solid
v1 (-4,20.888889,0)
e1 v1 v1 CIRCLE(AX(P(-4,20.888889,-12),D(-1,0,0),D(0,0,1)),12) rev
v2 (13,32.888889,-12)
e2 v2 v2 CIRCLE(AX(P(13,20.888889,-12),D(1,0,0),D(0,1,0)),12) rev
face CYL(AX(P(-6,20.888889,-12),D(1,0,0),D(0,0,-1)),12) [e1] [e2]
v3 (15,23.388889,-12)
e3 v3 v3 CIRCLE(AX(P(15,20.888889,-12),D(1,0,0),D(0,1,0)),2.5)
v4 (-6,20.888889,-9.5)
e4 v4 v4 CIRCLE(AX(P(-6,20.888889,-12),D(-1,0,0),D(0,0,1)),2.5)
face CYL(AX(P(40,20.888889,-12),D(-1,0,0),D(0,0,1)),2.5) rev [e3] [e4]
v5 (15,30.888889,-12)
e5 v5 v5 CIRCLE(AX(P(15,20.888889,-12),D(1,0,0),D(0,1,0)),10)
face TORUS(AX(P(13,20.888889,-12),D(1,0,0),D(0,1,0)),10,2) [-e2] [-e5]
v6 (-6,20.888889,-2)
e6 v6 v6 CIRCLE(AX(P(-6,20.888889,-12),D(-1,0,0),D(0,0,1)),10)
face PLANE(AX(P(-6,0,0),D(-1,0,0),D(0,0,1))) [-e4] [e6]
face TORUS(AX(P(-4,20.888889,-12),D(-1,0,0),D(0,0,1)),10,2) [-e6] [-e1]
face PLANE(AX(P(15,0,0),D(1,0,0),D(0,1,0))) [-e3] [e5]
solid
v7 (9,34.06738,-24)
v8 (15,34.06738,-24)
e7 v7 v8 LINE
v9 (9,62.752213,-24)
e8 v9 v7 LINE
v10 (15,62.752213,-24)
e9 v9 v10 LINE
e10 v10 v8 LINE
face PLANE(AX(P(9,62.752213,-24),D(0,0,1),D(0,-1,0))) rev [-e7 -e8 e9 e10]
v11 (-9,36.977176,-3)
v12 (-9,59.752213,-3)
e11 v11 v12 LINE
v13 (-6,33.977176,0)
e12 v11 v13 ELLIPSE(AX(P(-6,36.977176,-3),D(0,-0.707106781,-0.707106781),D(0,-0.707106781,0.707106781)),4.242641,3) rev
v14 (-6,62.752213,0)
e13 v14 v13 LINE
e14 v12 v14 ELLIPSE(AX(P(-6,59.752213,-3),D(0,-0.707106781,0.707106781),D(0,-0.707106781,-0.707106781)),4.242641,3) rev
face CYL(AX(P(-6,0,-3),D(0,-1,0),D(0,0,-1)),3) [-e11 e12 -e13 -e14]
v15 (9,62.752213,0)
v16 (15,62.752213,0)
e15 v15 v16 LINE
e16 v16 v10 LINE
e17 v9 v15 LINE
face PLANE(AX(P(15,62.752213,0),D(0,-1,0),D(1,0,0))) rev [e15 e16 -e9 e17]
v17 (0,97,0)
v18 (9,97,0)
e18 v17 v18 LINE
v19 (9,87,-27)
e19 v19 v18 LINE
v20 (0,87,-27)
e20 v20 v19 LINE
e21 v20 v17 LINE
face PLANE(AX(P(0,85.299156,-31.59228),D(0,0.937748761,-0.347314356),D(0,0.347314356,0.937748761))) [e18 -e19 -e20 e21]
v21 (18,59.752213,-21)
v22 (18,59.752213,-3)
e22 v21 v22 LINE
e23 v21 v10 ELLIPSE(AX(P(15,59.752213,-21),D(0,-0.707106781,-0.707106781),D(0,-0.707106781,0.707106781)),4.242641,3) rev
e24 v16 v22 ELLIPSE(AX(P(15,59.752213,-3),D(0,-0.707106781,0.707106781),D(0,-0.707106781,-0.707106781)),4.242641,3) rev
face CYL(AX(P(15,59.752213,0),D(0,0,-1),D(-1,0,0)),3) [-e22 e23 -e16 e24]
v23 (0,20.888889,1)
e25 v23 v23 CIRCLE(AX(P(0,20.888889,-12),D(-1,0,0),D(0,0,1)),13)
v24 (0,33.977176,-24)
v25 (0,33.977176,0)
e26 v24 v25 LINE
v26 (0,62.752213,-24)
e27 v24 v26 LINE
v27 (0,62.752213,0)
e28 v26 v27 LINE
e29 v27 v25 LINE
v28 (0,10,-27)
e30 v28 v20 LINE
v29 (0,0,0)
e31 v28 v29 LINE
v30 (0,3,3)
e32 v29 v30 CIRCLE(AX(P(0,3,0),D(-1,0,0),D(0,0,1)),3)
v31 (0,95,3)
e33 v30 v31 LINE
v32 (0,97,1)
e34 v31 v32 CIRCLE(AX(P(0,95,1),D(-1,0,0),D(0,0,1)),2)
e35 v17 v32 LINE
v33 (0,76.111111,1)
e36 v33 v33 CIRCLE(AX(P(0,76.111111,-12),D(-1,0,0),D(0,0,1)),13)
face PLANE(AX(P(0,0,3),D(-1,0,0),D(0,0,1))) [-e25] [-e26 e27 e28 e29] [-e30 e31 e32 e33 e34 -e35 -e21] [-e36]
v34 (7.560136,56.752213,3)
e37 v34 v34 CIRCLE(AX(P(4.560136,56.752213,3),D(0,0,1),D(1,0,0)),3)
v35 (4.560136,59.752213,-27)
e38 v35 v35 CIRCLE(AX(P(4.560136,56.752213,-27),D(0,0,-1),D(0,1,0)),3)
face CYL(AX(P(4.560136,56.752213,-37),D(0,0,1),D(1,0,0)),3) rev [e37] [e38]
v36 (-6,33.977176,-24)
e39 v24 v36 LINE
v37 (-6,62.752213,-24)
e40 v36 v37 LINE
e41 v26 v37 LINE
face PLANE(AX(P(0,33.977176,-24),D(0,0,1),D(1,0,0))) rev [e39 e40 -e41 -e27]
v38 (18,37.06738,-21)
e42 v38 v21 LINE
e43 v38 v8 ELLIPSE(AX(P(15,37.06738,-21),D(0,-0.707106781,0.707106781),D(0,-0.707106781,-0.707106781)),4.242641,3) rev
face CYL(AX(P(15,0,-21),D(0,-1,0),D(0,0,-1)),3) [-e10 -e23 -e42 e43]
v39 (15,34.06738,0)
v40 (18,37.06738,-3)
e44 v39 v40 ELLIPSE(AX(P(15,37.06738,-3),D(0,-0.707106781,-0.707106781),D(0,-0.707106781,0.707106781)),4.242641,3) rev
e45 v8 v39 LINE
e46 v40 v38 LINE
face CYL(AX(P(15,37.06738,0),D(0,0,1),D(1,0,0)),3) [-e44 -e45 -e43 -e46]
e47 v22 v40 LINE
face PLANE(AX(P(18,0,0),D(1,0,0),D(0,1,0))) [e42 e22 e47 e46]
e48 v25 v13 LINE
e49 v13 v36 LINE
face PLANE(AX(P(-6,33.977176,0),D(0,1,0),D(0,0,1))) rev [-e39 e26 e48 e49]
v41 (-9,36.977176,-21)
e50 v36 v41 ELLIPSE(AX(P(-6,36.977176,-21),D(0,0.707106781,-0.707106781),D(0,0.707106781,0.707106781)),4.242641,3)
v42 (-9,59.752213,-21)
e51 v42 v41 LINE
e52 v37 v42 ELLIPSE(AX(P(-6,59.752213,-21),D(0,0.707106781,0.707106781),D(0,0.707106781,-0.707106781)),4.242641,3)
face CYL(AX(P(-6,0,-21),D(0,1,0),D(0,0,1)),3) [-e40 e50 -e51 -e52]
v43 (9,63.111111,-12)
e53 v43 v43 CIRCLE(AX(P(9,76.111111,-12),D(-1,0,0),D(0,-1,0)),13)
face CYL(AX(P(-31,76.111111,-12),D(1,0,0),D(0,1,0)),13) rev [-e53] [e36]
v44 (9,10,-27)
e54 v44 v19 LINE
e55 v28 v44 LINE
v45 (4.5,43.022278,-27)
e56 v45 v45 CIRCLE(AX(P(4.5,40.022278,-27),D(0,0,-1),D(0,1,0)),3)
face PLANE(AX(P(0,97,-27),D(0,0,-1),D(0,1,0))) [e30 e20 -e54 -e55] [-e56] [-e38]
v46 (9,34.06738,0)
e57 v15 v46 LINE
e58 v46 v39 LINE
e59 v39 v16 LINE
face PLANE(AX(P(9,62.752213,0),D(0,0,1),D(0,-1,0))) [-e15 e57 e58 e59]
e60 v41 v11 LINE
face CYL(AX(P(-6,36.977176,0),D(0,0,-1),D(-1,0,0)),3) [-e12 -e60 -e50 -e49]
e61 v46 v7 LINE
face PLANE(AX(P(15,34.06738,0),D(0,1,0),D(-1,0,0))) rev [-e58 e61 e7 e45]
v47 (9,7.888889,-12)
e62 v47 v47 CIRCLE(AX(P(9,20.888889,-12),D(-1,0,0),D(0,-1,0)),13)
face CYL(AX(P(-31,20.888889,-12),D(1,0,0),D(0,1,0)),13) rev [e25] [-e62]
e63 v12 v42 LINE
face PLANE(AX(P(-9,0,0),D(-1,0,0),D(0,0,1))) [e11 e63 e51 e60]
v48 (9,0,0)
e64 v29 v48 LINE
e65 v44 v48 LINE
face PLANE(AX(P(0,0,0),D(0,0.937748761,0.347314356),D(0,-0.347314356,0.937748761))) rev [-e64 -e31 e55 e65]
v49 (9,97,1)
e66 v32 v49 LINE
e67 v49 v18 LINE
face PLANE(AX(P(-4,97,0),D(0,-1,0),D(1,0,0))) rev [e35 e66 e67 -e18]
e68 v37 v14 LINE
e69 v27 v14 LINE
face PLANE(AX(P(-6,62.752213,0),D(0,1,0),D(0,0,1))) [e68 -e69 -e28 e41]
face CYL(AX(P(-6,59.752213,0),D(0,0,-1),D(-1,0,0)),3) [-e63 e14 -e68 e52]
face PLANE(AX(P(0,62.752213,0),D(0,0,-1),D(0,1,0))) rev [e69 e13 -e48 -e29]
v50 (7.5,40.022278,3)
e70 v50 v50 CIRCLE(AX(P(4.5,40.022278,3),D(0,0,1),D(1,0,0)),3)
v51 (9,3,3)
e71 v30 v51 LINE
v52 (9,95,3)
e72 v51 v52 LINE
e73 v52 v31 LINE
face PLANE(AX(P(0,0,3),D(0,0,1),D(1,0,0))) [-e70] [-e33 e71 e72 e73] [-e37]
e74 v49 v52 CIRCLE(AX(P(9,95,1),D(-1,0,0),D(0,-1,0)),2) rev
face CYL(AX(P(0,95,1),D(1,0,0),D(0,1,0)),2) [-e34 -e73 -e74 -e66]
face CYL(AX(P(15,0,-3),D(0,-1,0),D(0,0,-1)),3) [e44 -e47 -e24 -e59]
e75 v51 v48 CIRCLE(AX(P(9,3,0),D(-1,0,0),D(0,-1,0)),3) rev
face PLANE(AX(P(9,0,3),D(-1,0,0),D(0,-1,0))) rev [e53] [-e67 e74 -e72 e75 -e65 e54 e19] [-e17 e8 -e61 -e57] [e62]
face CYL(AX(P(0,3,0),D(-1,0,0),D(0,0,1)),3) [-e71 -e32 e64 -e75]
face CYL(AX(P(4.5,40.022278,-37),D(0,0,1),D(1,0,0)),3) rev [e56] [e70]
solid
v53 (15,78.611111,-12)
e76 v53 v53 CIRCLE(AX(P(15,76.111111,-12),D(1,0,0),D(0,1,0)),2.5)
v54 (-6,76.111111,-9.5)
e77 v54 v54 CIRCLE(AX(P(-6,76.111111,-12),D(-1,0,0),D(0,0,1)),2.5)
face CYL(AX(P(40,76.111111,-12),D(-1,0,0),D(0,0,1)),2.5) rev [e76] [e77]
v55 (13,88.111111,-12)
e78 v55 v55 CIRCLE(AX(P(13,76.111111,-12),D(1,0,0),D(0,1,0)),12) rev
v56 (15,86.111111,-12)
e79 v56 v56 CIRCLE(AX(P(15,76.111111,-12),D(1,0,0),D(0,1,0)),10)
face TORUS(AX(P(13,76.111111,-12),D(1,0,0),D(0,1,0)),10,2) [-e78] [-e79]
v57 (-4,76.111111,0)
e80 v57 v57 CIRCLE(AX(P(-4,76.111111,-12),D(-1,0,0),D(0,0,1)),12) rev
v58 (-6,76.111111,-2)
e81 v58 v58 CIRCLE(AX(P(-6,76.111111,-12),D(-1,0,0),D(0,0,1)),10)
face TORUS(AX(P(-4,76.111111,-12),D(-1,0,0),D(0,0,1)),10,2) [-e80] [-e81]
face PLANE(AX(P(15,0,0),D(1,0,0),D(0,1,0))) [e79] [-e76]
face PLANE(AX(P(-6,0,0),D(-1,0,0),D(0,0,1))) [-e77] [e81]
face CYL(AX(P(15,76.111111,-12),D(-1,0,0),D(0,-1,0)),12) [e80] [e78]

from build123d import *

# Parameters (mm, degrees)
SKETCH1_W            = 9
SKETCH1_H            = 100
BOSS_EXTRUDE1_DEPTH  = 3
FILLET1_R            = 3
SKETCH2_W            = 3
SKETCH2_H            = 3
CUT_EXTRUDE1_DEPTH   = 13
SKETCH3_W            = 27
SKETCH3_H            = 97
BOSS_EXTRUDE2_DEPTH  = 9
CUT_EXTRUDE2_DEPTH   = 9
BOSS_EXTRUDE5_DEPTH  = 6
BOSS_EXTRUDE6_START  = 6
BOSS_EXTRUDE6_DEPTH  = 6
SKETCH9_R            = 2.5
CUT_EXTRUDE3_DEPTH   = 46
CUT_EXTRUDE4_START   = -46
SKETCH10_R           = 13
SKETCH10_R_2         = 12
CUT_EXTRUDE4_DEPTH   = 46
SKETCH11_W           = 30
SKETCH11_H           = 14.252212687
SKETCH11_H_2         = 14.52282432
BOSS_EXTRUDE7_DEPTH  = 6
SKETCH12_W           = 30
SKETCH12_H           = 12.752212687
SKETCH12_H_2         = 15.932620442
BOSS_EXTRUDE8_DEPTH  = 6
SKETCH13_W           = 3
SKETCH13_H           = 28.684833129
CUT_EXTRUDE5_DEPTH   = 6
SKETCH14_W           = 3
SKETCH14_H           = 28.775037007
CUT_EXTRUDE6_DEPTH   = 6
SKETCH15_W           = 24
SKETCH15_H           = 28.775037007
BOSS_EXTRUDE9_DEPTH  = 3
SKETCH16_W           = 24
SKETCH16_H           = 28.684833129
BOSS_EXTRUDE10_DEPTH = 3
FILLET2_R            = 2
FILLET3_R            = 2
FILLET4_R            = 2
SKETCH18_R           = 3
CUT_EXTRUDE7_DEPTH   = 40
FILLET5_R            = 3


with BuildPart() as part:
    # Sketch1 → Boss-Extrude1 (new body)
    with BuildSketch(Plane.XY):
        with Locations((4.5, 50)):
            Rectangle(SKETCH1_W, SKETCH1_H)
    extrude(amount=BOSS_EXTRUDE1_DEPTH)

    # Fillet1
    fillet1_edges = [part.edges().sort_by_distance(p)[0] for p in [
        (4.5, 0, 3),
        (4.5, 100, 3),
    ]]
    fillet(fillet1_edges, radius=FILLET1_R - 0.0001)  # a hair under: the kernel refuses the full size

    # Sketch2 → Cut-Extrude1 (cut)
    with BuildSketch(Plane(origin=(9, 0, 0), x_dir=(0, 0, -1), z_dir=(1, 0, 0))):
        with Locations((-1.5, 98.5)):
            Rectangle(SKETCH2_W, SKETCH2_H)
    extrude(amount=-CUT_EXTRUDE1_DEPTH, mode=Mode.SUBTRACT)

    # Sketch3 → Boss-Extrude2 (add)
    with BuildSketch(Plane(origin=(9, 0, 0), x_dir=(0, 0, -1), z_dir=(1, 0, 0))):
        with Locations((13.5, 48.5)):
            Rectangle(SKETCH3_W, SKETCH3_H)
    extrude(amount=-BOSS_EXTRUDE2_DEPTH)

    # Sketch4 → Cut-Extrude2 (cut)
    with BuildSketch(Plane(origin=(9, 0, 0), x_dir=(0, 0, -1), z_dir=(1, 0, 0))):
        Polygon((27, 87), (27, 97), (0, 97), align=None)
        Polygon((27, 0), (27, 10), (0, 0), align=None)
    extrude(amount=-CUT_EXTRUDE2_DEPTH, mode=Mode.SUBTRACT)

    # Sketch7 → Boss-Extrude5 (add)
    with BuildSketch(Plane(origin=(9, 0, 0), x_dir=(0, 0, -1), z_dir=(1, 0, 0))):
        with BuildLine():
            ThreePointArc((3.514718626, 84.596392485), (0.91344561, 80.703312299), (0, 76.111111111))
            ThreePointArc((0, 76.111111111), (3.514718626, 67.625829737), (12, 64.111111111))
            ThreePointArc((12, 64.111111111), (16.592201188, 65.024556721), (20.485281374, 67.625829737))
            Line((20.485281374, 67.625829737), (3.514718626, 84.596392485))
        make_face()
        with BuildLine():
            ThreePointArc((24, 76.111111111), (20.485281374, 84.596392485), (12, 88.111111111))
            ThreePointArc((12, 88.111111111), (7.407798812, 87.197665501), (3.514718626, 84.596392485))
            Line((3.514718626, 84.596392485), (20.485281374, 67.625829737))
            ThreePointArc((20.485281374, 67.625829737), (23.08655439, 71.518909923), (24, 76.111111111))
        make_face()
        with BuildLine():
            ThreePointArc((12, 32.888888889), (3.514718621, 29.374170258), (0, 20.888888874))
            ThreePointArc((0, 20.888888874), (0.913445613, 16.296687694), (3.514718626, 12.403607515))
            Line((3.514718626, 12.403607515), (20.485281374, 29.374170263))
            ThreePointArc((20.485281374, 29.374170263), (16.592201188, 31.975443279), (12, 32.888888889))
        make_face()
        with BuildLine():
            ThreePointArc((12, 8.888888889), (20.485281374, 12.403607515), (24, 20.888888889))
            ThreePointArc((24, 20.888888889), (23.08655439, 25.481090077), (20.485281374, 29.374170263))
            Line((20.485281374, 29.374170263), (3.514718626, 12.403607515))
            ThreePointArc((3.514718626, 12.403607515), (7.407798812, 9.802334499), (12, 8.888888889))
        make_face()
    extrude(amount=BOSS_EXTRUDE5_DEPTH)

    # Sketch8 → Boss-Extrude6 (add)
    with BuildSketch(Plane.ZY.offset(BOSS_EXTRUDE6_START)):
        with BuildLine():
            ThreePointArc((-3.514718626, 67.625829737), (-0.91344561, 71.518909923), (0, 76.111111111))
            ThreePointArc((0, 76.111111111), (-3.514718626, 84.596392485), (-12, 88.111111111))
            ThreePointArc((-12, 88.111111111), (-16.592201188, 87.197665501), (-20.485281374, 84.596392485))
            Line((-20.485281374, 84.596392485), (-3.514718626, 67.625829737))
        make_face()
        with BuildLine():
            ThreePointArc((-12, 64.111111111), (-7.407798812, 65.024556721), (-3.514718626, 67.625829737))
            Line((-3.514718626, 67.625829737), (-20.485281374, 84.596392485))
            ThreePointArc((-20.485281374, 84.596392485), (-23.086554402, 80.703312271), (-24, 76.111111049))
            ThreePointArc((-24, 76.111111049), (-20.485281352, 67.625829715), (-12, 64.111111111))
        make_face()
        with BuildLine():
            ThreePointArc((-3.514718626, 12.403607515), (-0.91344561, 16.296687701), (0, 20.888888889))
            ThreePointArc((0, 20.888888889), (-3.514718626, 29.374170263), (-12, 32.888888889))
            ThreePointArc((-12, 32.888888889), (-16.592201188, 31.975443279), (-20.485281374, 29.374170263))
            Line((-20.485281374, 29.374170263), (-3.514718626, 12.403607515))
        make_face()
        with BuildLine():
            ThreePointArc((-11.999999953, 8.888888889), (-7.40779879, 9.802334508), (-3.514718626, 12.403607515))
            Line((-3.514718626, 12.403607515), (-20.485281374, 29.374170263))
            ThreePointArc((-20.485281374, 29.374170263), (-23.086554378, 25.481090106), (-24, 20.888888951))
            ThreePointArc((-24, 20.888888951), (-20.485281379, 12.40360752), (-11.999999953, 8.888888889))
        make_face()
    extrude(amount=-BOSS_EXTRUDE6_DEPTH)

    # Sketch9 → Cut-Extrude3 (cut)
    with BuildSketch(Plane.ZY.offset(6)):
        with Locations((-12, 76.111111111)):
            Circle(SKETCH9_R)
        with Locations((-12, 20.888888889)):
            Circle(SKETCH9_R)
    extrude(amount=-CUT_EXTRUDE3_DEPTH, mode=Mode.SUBTRACT)

    # Sketch10 → Cut-Extrude4 (cut)
    # profile 1 of 2: a face of its own
    with BuildSketch(Plane(origin=(15, 0, 0), x_dir=(0, 0, -1), z_dir=(1, 0, 0)).offset(CUT_EXTRUDE4_START)):
        with Locations(Location((12, 76.111111111, 0), (0, 0, 180))):
            Circle(SKETCH10_R)
        with Locations(Location((12, 76.111111111, 0), (0, 0, 180))):
            Circle(SKETCH10_R_2, mode=Mode.SUBTRACT)
    # profile 2 of 2: a face of its own
    with BuildSketch(Plane(origin=(15, 0, 0), x_dir=(0, 0, -1), z_dir=(1, 0, 0)).offset(CUT_EXTRUDE4_START)):
        with Locations(Location((12, 20.888888889, 0), (0, 0, 180))):
            Circle(SKETCH10_R)
        with Locations(Location((12, 20.888888889, 0), (0, 0, 90))):
            Circle(SKETCH10_R_2, mode=Mode.SUBTRACT)
    extrude(amount=CUT_EXTRUDE4_DEPTH, mode=Mode.SUBTRACT)


with BuildPart() as cut_extrude4_piece_1:
    # of the separate pieces the step leaves, piece 1, a body of its own (cut_extrude4_pieces)
    add(part.part.solids().sort_by_distance((0, 0, 0.0001))[0])

    # Sketch11 → Boss-Extrude7 (add)
    with BuildSketch(Plane.ZY):
        with Locations((-12, 55.626106343)):
            Rectangle(SKETCH11_W, SKETCH11_H)
        with Locations((-12, 41.23858784)):
            Rectangle(SKETCH11_W, SKETCH11_H_2)
    extrude(amount=BOSS_EXTRUDE7_DEPTH)

    # Sketch12 → Boss-Extrude8 (add)
    with BuildSketch(Plane(origin=(9, 0, 0), x_dir=(0, 0, -1), z_dir=(1, 0, 0))):
        with Locations((12, 56.376106343)):
            Rectangle(SKETCH12_W, SKETCH12_H)
        with Locations((12, 42.033689779)):
            Rectangle(SKETCH12_W, SKETCH12_H_2)
    extrude(amount=BOSS_EXTRUDE8_DEPTH)

    # Sketch13 → Cut-Extrude5 (cut)
    with BuildSketch(Plane(origin=(15, 0, 0), x_dir=(0, 0, -1), z_dir=(1, 0, 0))):
        with Locations((25.5, 48.409796122)):
            Rectangle(SKETCH13_W, SKETCH13_H)
        with Locations((-1.5, 48.409796122)):
            Rectangle(SKETCH13_W, SKETCH13_H)
    extrude(amount=-CUT_EXTRUDE5_DEPTH, mode=Mode.SUBTRACT)

    # Sketch14 → Cut-Extrude6 (cut)
    with BuildSketch(Plane.ZY.offset(6)):
        with Locations((1.5, 48.364694184)):
            Rectangle(SKETCH14_W, SKETCH14_H)
        with Locations((-25.5, 48.364694184)):
            Rectangle(SKETCH14_W, SKETCH14_H)
    extrude(amount=-CUT_EXTRUDE6_DEPTH, mode=Mode.SUBTRACT)

    # Sketch15 → Boss-Extrude9 (add, symmetric)
    with BuildSketch(Plane.ZY.offset(6)):
        with Locations((-12, 48.364694184)):
            Rectangle(SKETCH15_W, SKETCH15_H)
    extrude(amount=BOSS_EXTRUDE9_DEPTH, both=True)

    # Sketch16 → Boss-Extrude10 (add, symmetric)
    with BuildSketch(Plane(origin=(15, 0, 0), x_dir=(0, 0, -1), z_dir=(1, 0, 0))):
        with Locations((12, 48.409796122)):
            Rectangle(SKETCH16_W, SKETCH16_H)
    extrude(amount=BOSS_EXTRUDE10_DEPTH, both=True)

    # Fillet4
    fillet4_edges = [cut_extrude4_piece_1.edges().sort_by_distance(p)[0] for p in [
        (4.5, 97, 3),
    ]]
    fillet(fillet4_edges, radius=FILLET4_R)

    # Sketch18 → Cut-Extrude7 (cut)
    with BuildSketch(Plane.XY.offset(3)):
        with Locations((4.5, 40.022277619)):
            Circle(SKETCH18_R)
        with Locations((4.560135919, 56.752212687)):
            Circle(SKETCH18_R)
    extrude(amount=-CUT_EXTRUDE7_DEPTH, mode=Mode.SUBTRACT)

    # Fillet5
    fillet5_edges = [cut_extrude4_piece_1.edges().sort_by_distance(p)[0] for p in [
        (-9, 48.364694183, -24),
        (-9, 33.97717568, -12),
        (-9, 48.364694183, 0),
        (-9, 62.752212687, -12),
        (18, 48.409796122, 0),
        (18, 34.067379558, -12),
        (18, 48.409796122, -24),
        (18, 62.752212687, -12),
    ]]
    fillet(fillet5_edges, radius=FILLET5_R)


with BuildPart() as cut_extrude4_piece_2:
    # of the separate pieces the step leaves, piece 2, a body of its own (cut_extrude4_pieces)
    add(part.part.solids().sort_by_distance((-6, 84.596392485, -20.485281374))[0])

    # Fillet2
    fillet2_edges = [cut_extrude4_piece_2.edges().sort_by_distance(p)[0] for p in [
        (15, 71.518909923, -23.08655439),
        (-6, 87.197665501, -7.407798812),
    ]]
    fillet(fillet2_edges, radius=FILLET2_R)


with BuildPart() as cut_extrude4_piece_3:
    # of the separate pieces the step leaves, piece 3, a body of its own (cut_extrude4_pieces)
    add(part.part.solids().sort_by_distance((-6, 29.374170263, -20.485281374))[0])

    # Fillet3
    fillet3_edges = [cut_extrude4_piece_3.edges().sort_by_distance(p)[0] for p in [
        (-6, 9.802334499, -7.407798812),
        (15, 31.975443279, -16.592201188),
    ]]
    fillet(fillet3_edges, radius=FILLET3_R)


solid = Compound([cut_extrude4_piece_1.part, cut_extrude4_piece_2.part, cut_extrude4_piece_3.part])
